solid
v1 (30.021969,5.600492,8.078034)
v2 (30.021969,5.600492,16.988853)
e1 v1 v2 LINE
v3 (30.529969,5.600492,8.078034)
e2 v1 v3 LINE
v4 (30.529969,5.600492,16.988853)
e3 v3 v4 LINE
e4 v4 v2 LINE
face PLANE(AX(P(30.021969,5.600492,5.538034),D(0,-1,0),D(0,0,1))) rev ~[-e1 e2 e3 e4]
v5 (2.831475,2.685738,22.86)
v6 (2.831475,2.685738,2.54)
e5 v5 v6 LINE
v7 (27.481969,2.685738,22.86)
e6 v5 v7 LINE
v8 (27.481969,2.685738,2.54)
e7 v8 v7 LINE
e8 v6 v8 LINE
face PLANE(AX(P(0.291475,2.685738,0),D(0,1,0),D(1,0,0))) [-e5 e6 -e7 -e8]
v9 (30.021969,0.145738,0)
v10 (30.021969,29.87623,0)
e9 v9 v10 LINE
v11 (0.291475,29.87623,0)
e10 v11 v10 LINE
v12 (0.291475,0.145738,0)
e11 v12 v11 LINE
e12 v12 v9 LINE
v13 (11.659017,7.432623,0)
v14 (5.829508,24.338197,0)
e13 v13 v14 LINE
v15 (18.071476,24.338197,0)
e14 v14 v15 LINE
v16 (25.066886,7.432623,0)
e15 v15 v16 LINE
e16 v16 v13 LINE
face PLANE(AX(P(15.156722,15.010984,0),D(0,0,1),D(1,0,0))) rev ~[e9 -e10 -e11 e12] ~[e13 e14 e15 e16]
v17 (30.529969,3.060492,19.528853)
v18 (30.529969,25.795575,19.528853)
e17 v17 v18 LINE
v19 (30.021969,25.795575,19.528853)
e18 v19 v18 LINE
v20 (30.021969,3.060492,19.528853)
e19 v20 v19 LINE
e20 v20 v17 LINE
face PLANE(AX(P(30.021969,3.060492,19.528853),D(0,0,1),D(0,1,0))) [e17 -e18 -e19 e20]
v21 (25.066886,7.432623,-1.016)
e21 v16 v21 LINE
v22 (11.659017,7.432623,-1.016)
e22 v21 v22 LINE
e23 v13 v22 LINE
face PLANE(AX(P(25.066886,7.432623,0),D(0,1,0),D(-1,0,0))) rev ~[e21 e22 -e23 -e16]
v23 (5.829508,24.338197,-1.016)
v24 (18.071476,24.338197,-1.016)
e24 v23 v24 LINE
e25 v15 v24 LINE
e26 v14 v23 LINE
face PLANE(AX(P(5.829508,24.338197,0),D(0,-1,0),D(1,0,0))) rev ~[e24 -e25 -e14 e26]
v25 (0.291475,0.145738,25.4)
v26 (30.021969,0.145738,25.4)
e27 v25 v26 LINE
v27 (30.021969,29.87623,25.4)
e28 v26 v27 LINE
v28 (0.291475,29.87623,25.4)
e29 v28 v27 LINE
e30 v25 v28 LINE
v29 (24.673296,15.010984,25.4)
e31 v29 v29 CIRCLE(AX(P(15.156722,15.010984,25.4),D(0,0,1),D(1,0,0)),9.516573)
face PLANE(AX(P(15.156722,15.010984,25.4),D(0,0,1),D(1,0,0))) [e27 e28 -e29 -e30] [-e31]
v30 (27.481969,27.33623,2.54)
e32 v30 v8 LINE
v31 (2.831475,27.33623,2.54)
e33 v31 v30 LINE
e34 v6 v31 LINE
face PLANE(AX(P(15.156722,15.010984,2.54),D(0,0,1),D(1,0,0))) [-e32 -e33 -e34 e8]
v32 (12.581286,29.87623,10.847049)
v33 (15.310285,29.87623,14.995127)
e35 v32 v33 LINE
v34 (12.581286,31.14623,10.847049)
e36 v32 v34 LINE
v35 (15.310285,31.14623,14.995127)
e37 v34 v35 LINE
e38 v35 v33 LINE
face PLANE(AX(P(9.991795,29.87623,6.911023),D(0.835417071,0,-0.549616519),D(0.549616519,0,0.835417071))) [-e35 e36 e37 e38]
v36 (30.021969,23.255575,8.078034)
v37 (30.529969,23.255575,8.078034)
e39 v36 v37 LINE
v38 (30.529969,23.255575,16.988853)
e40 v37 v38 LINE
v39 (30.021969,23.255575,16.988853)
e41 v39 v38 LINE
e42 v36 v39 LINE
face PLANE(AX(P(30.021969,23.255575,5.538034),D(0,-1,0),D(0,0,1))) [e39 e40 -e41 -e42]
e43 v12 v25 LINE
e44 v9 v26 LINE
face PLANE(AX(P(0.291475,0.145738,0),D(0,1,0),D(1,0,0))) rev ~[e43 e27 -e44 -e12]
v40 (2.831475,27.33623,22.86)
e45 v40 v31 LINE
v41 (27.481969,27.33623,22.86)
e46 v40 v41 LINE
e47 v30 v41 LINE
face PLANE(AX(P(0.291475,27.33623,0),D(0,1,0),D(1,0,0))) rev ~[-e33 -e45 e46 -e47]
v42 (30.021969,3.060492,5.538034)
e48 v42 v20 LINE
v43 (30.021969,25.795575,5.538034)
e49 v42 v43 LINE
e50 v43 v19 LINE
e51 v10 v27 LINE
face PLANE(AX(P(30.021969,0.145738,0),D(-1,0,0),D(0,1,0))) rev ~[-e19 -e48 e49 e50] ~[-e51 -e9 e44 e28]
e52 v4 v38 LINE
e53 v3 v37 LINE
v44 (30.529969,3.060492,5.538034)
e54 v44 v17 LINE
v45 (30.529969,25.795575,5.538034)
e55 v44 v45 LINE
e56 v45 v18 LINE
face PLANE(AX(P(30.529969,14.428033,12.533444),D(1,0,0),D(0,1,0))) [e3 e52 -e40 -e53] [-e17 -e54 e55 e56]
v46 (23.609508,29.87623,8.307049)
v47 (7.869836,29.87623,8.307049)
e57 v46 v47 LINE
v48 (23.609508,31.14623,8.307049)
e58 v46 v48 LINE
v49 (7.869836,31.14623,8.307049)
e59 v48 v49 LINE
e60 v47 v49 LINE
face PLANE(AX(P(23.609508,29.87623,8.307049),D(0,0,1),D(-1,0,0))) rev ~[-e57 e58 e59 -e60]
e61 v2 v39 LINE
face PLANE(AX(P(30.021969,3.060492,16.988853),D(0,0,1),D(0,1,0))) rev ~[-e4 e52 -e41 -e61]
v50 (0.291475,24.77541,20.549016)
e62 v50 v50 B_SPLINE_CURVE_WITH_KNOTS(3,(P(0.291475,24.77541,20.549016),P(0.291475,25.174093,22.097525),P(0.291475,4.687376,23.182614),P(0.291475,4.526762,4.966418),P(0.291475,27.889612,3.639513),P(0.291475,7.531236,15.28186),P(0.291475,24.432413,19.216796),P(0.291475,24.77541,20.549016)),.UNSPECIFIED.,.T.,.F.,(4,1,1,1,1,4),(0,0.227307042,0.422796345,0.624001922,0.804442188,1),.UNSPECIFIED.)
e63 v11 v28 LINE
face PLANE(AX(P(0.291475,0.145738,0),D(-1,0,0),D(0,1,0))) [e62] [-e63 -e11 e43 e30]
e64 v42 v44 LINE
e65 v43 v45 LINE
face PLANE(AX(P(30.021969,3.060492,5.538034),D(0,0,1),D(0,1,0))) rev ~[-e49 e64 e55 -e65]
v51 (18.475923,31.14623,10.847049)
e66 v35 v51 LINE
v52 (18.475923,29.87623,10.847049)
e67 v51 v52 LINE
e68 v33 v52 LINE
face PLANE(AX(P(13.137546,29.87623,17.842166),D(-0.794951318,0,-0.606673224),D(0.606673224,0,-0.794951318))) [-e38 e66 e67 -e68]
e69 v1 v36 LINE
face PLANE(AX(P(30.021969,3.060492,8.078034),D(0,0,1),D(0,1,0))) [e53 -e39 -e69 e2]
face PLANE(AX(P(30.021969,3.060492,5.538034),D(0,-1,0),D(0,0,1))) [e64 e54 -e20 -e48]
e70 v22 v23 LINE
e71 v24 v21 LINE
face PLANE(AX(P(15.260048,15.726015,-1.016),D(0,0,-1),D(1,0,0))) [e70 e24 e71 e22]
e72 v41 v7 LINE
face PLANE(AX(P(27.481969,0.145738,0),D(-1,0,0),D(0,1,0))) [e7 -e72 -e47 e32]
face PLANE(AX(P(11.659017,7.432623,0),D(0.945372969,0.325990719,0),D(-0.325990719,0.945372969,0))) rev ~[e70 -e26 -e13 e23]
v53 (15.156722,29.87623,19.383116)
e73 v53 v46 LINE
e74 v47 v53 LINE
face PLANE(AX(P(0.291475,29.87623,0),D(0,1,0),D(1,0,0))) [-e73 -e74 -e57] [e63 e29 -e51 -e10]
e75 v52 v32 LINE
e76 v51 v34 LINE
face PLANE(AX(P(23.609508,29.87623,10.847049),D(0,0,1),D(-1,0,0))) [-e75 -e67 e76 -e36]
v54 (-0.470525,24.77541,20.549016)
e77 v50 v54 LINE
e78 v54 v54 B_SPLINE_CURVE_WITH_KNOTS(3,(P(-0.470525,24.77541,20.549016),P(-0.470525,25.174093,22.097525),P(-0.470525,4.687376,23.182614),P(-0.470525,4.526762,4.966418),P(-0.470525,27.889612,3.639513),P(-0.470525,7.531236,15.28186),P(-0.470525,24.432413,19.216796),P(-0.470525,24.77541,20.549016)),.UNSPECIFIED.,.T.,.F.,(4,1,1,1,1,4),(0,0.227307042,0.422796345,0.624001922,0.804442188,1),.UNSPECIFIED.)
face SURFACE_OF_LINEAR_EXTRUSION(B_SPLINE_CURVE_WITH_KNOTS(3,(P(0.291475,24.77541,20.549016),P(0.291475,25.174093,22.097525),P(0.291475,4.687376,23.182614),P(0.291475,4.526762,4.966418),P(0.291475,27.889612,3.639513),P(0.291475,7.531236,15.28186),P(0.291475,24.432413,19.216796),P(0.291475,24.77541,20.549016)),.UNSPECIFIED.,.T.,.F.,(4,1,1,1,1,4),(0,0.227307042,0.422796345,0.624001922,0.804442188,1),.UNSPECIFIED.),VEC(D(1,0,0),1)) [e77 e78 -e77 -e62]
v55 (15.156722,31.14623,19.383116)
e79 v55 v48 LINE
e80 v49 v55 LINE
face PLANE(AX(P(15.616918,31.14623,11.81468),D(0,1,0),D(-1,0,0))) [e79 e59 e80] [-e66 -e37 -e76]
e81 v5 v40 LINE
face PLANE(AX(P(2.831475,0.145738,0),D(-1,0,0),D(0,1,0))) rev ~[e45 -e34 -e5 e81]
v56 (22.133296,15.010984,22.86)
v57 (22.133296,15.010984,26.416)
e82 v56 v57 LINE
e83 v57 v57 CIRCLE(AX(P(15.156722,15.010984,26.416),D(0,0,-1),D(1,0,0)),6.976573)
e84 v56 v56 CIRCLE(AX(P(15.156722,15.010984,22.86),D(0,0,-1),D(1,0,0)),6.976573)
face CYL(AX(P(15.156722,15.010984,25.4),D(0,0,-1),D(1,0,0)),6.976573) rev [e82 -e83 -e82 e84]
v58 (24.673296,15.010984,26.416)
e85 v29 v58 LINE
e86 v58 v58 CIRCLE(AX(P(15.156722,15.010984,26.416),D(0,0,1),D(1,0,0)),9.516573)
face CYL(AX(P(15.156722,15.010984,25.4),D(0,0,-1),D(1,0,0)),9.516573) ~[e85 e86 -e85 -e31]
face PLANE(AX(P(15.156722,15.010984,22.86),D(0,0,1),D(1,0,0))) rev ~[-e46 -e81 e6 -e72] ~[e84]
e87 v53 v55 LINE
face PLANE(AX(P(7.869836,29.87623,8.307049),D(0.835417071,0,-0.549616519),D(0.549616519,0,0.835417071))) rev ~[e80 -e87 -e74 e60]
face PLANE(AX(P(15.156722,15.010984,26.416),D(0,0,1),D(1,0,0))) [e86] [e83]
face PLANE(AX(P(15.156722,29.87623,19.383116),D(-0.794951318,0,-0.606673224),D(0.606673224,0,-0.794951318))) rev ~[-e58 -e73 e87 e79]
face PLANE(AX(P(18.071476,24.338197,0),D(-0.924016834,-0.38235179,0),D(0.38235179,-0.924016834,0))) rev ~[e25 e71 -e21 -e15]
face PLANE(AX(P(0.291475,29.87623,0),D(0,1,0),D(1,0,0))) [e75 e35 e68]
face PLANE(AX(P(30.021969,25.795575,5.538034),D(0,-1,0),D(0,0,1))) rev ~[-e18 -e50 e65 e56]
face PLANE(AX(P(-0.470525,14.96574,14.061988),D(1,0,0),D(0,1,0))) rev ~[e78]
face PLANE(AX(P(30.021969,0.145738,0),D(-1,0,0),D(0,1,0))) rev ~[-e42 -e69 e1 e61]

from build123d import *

# Parameters (mm, degrees)
F0_W          = 29.7304940177
F0_H          = 29.7304925771
F1_DEPTH      = 25.4
F2_R          = 9.516573444
F3_DEPTH      = 1.016
F4_T          = -2.54
F5_W          = 22.7350834757
F5_H          = 13.9908185229
F6_DEPTH      = 0.508
F7_T          = 2.54
F7_T3_DEPTH   = 25.4
F7_T5_DEPTH   = 29.7304925771
F7_T7_DEPTH   = 29.7304940177
F7_T9_DEPTH   = 27.8150834757
F7_T11_DEPTH  = 19.0708185229
F9_DEPTH      = 1.27
F10_T         = 2.54
F10_T3_DEPTH  = 25.4
F10_T5_DEPTH  = 29.7304925771
F10_T7_DEPTH  = 29.7304940177
F10_T9_DEPTH  = 20.819671886
F10_T11_DEPTH = 19.0130124822
F10_T13_DEPTH = 18.3381282199
F10_T15_DEPTH = 27.8150834757
F10_T17_DEPTH = 19.0708185229
F10_T19_DEPTH = 22.7350834757
F10_T21_DEPTH = 5.588
F10_T23_DEPTH = 13.9908185229
F12_DEPTH     = 1.016
F14_DEPTH     = 0.762


# Not quite as in the source:
# - a shell that OpenCascade refuses in one call is made with other operations: the cavity is built on its own and cut out


with BuildPart() as f1:
    # F0 (on Top) → F1 (new body)
    with BuildSketch(Plane.XY):
        with Locations((15.1567222201, 15.010983996)):
            Rectangle(F0_W, F0_H)
    extrude(amount=F1_DEPTH)

    # F2 (on face) → F3 (join)
    with BuildSketch(Plane.XY.offset(25.4)):
        with Locations((15.1567222201, 15.010983996)):
            Circle(F2_R)
    extrude(amount=F3_DEPTH)

    # F4
    f4_openings = [f1.faces().sort_by_distance(p)[0] for p in [
        (15.156722, 15.010984, 26.416),
    ]]
    offset(amount=F4_T, openings=f4_openings, kind=Kind.INTERSECTION)

    # F5 (on face) → F6 (join)
    with BuildSketch(Plane.YZ.offset(30.021969229)):
        with Locations((14.4280334935, 12.5334435143)):
            Rectangle(F5_W, F5_H)
    extrude(amount=F6_DEPTH)

    # F7: shell of thickness 2.54, made by hand


with BuildPart() as f7_core1:
    # F7_t2: copy of F1
    add(f1.part)

    # the walls: a layer under each face that stays
    f7_faces = [f7_core1.faces().sort_by_distance(p)[0] for p in [
        (2.8314752113, 15.010983996, 12.7),
        (15.1567222201, 27.3362302846, 12.7),
        (6.9398908809, 6.794153137, 22.86),
        (15.1567222201, 2.6857377075, 12.7),
        (15.1567222201, 15.010983996, 2.54),
        (27.481969229, 15.010983996, 12.7),
        (8.1801487762, 15.010983996, 24.638),
        (8.8123399241, 8.6666017001, 26.416),
        (5.6401487762, 15.010983996, 25.908),
        (5.2465575476, 5.1008198037, 25.4),
        (0.2914752113, 15.010983996, 12.7),
        (15.1567222201, 29.8762302846, 12.7),
        (15.1567222201, 0.1457377075, 12.7),
        (30.021969229, 5.1008198037, 21.1666666667),
        (15.1567222201, 15.010983996, 0),
        (30.275969229, 14.4280334935, 5.5380342528),
        (30.275969229, 3.0604917556, 12.5334435143),
        (30.275969229, 14.4280334935, 19.5288527757),
        (30.275969229, 25.7955752313, 12.5334435143),
    ]]
    thicken(f7_faces, amount=-F7_T, mode=Mode.SUBTRACT)

    # F7_s4 → F7_t3 (cut)
    with BuildSketch(Plane.XY):
        Polygon((2.8568752113, 27.3108302846), (0.2914752113, 27.3362302846), (0.2914752113, 29.8762302846), (2.8314752113, 29.8762302846), align=None)
        Polygon((2.8568752113, 2.7111377075), (0.2914752113, 2.6857377075), (0.2914752113, 0.1457377075), (2.8314752113, 0.1457377075), align=None)
        Polygon((27.456569229, 27.3108302846), (27.481969229, 29.8762302846), (30.021969229, 29.8762302846), (30.021969229, 27.3362302846), align=None)
        Polygon((27.456569229, 2.7111377075), (27.481969229, 0.1457377075), (30.021969229, 0.1457377075), (30.021969229, 2.6857377075), align=None)
    extrude(amount=F7_T3_DEPTH, mode=Mode.SUBTRACT)

    # F7_s6 → F7_t5 (cut)
    with BuildSketch(Plane.XZ.offset(-29.8762302846)):
        Polygon((2.8568752113, 22.8346), (0.2914752113, 22.86), (0.2914752113, 25.4), (2.8314752113, 25.4), align=None)
        Polygon((2.8568752113, 2.5654), (0.2914752113, 2.54), (0.2914752113, 0), (2.8314752113, 0), align=None)
        Polygon((27.456569229, 22.8346), (27.481969229, 25.4), (30.021969229, 25.4), (30.021969229, 22.86), align=None)
        Polygon((27.456569229, 2.5654), (27.481969229, 0), (30.021969229, 0), (30.021969229, 2.54), align=None)
    extrude(amount=F7_T5_DEPTH, mode=Mode.SUBTRACT)

    # F7_s8 → F7_t7 (cut)
    with BuildSketch(Plane.YZ.offset(0.2914752113)):
        Polygon((27.3108302846, 22.8346), (29.8762302846, 22.86), (29.8762302846, 25.4), (27.3362302846, 25.4), align=None)
        Polygon((27.3108302846, 2.5654), (29.8762302846, 2.54), (29.8762302846, 0), (27.3362302846, 0), align=None)
        Polygon((2.7111377075, 22.8346), (2.6857377075, 25.4), (0.1457377075, 25.4), (0.1457377075, 22.86), align=None)
        Polygon((2.7111377075, 2.5654), (0.1457377075, 2.54), (0.1457377075, 0), (2.6857377075, 0), align=None)
    extrude(amount=F7_T7_DEPTH, mode=Mode.SUBTRACT)

    # F7_s10 → F7_t9 (cut)
    with BuildSketch(Plane.XZ.offset(-28.3355752313)):
        Polygon((30.047369229, 5.5126342528), (27.481969229, 5.5380342528), (27.481969229, 8.0780342528), (30.021969229, 8.0780342528), align=None)
        Polygon((30.047369229, 19.5542527757), (27.481969229, 19.5288527757), (27.481969229, 16.9888527757), (30.021969229, 16.9888527757), align=None)
    extrude(amount=F7_T9_DEPTH, mode=Mode.SUBTRACT)

    # F7_s12 → F7_t11 (cut)
    with BuildSketch(Plane.XY.offset(2.9980342528)):
        Polygon((30.047369229, 3.0350917556), (27.481969229, 3.0604917556), (27.481969229, 5.6004917556), (30.021969229, 5.6004917556), align=None)
        Polygon((30.047369229, 25.8209752313), (27.481969229, 25.7955752313), (27.481969229, 23.2555752313), (30.021969229, 23.2555752313), align=None)
    extrude(amount=F7_T11_DEPTH, mode=Mode.SUBTRACT)

    # F7_s13 → F7_t14 (revolve, cut)
    with BuildSketch(Plane.XZ.offset(-15.010983996)):
        Polygon((24.6986956641, 25.4254), (22.1332956641, 25.4), (22.1332956641, 22.86), (24.6732956641, 22.86), align=None)
    revolve(axis=Axis((15.1567222201, 15.010983996, 25.4), (0, 0, 1)), mode=Mode.SUBTRACT)


with BuildPart() as f1_1:
    add(f1.part)

    # what is left inside the walls is the cavity
    f7_cavity = [f7_core1.part.solids().sort_by_distance(p)[0] for p in [
        (30.047369, 14.428033, 14.01858),
    ]]
    add(f7_cavity, mode=Mode.SUBTRACT)

    # F8 (on face) → F9 (join)
    with BuildSketch(Plane(origin=(0, 29.8762302846, 0), x_dir=(-1, 0, 0), z_dir=(0, 1, 0))):
        Polygon((-7.869835943, 8.3070490509), (-15.1567222201, 19.3831156939), (-23.609507829, 8.3070490509), (-15.1567222201, 8.3070490509), align=None)
    extrude(amount=F9_DEPTH)

    # F10: shell of thickness 2.54, made by hand


with BuildPart() as f10_core1:
    # F10_t2: copy of F1
    add(f1_1.part)

    # the walls: a layer under each face that stays
    f10_faces = [f10_core1.faces().sort_by_distance(p)[0] for p in [
        (2.8314752113, 15.010983996, 12.7),
        (15.1567222201, 27.3362302846, 12.7),
        (6.9398908809, 6.794153137, 22.86),
        (15.1567222201, 2.6857377075, 12.7),
        (15.1567222201, 15.010983996, 2.54),
        (27.481969229, 15.010983996, 12.7),
        (8.1801487762, 15.010983996, 24.638),
        (8.8123399241, 8.6666017001, 26.416),
        (5.6401487762, 15.010983996, 25.908),
        (5.2465575476, 5.1008198037, 25.4),
        (0.2914752113, 15.010983996, 12.7),
        (25.0668868927, 29.8762302846, 21.1666666667),
        (15.1567222201, 0.1457377075, 12.7),
        (30.021969229, 5.1008198037, 21.1666666667),
        (15.1567222201, 15.010983996, 0),
        (15.739671886, 30.5112302846, 8.3070490509),
        (19.3831150245, 30.5112302846, 13.8450823724),
        (11.5132790816, 30.5112302846, 13.8450823724),
        (30.275969229, 14.4280334935, 5.5380342528),
        (30.275969229, 3.0604917556, 12.5334435143),
        (30.275969229, 14.4280334935, 19.5288527757),
        (30.275969229, 25.7955752313, 12.5334435143),
        (30.529969229, 6.8496723349, 7.86983734),
        (30.275969229, 14.4280334935, 8.0780342528),
        (30.275969229, 23.2555752313, 12.5334435143),
        (30.275969229, 14.4280334935, 16.9888527757),
        (30.275969229, 5.6004917556, 12.5334435143),
        (30.021969229, 14.4280334935, 12.5334435143),
    ]]
    thicken(f10_faces, amount=-F10_T, mode=Mode.SUBTRACT)

    # F10_s4 → F10_t3 (cut)
    with BuildSketch(Plane.XY):
        Polygon((2.8568752113, 27.3108302846), (0.2914752113, 27.3362302846), (0.2914752113, 29.8762302846), (2.8314752113, 29.8762302846), align=None)
        Polygon((2.8568752113, 2.7111377075), (0.2914752113, 2.6857377075), (0.2914752113, 0.1457377075), (2.8314752113, 0.1457377075), align=None)
        Polygon((27.456569229, 27.3108302846), (27.481969229, 29.8762302846), (30.021969229, 29.8762302846), (30.021969229, 27.3362302846), align=None)
        Polygon((27.456569229, 2.7111377075), (27.481969229, 0.1457377075), (30.021969229, 0.1457377075), (30.021969229, 2.6857377075), align=None)
    extrude(amount=F10_T3_DEPTH, mode=Mode.SUBTRACT)

    # F10_s6 → F10_t5 (cut)
    with BuildSketch(Plane.XZ.offset(-29.8762302846)):
        Polygon((2.8568752113, 22.8346), (0.2914752113, 22.86), (0.2914752113, 25.4), (2.8314752113, 25.4), align=None)
        Polygon((2.8568752113, 2.5654), (0.2914752113, 2.54), (0.2914752113, 0), (2.8314752113, 0), align=None)
        Polygon((27.456569229, 22.8346), (27.481969229, 25.4), (30.021969229, 25.4), (30.021969229, 22.86), align=None)
        Polygon((27.456569229, 2.5654), (27.481969229, 0), (30.021969229, 0), (30.021969229, 2.54), align=None)
    extrude(amount=F10_T5_DEPTH, mode=Mode.SUBTRACT)

    # F10_s8 → F10_t7 (cut)
    with BuildSketch(Plane.YZ.offset(0.2914752113)):
        Polygon((27.3108302846, 22.8346), (29.8762302846, 22.86), (29.8762302846, 25.4), (27.3362302846, 25.4), align=None)
        Polygon((27.3108302846, 2.5654), (29.8762302846, 2.54), (29.8762302846, 0), (27.3362302846, 0), align=None)
        Polygon((2.7111377075, 22.8346), (2.6857377075, 25.4), (0.1457377075, 25.4), (0.1457377075, 22.86), align=None)
        Polygon((2.7111377075, 2.5654), (0.1457377075, 2.54), (0.1457377075, 0), (2.6857377075, 0), align=None)
    extrude(amount=F10_T7_DEPTH, mode=Mode.SUBTRACT)

    # F10_s10 → F10_t9 (cut)
    with BuildSketch(Plane.YZ.offset(5.329835943)):
        Polygon((29.9016302846, 8.2816490509), (27.3362302846, 8.3070490509), (27.3362302846, 10.8470490509), (29.8762302846, 10.8470490509), align=None)
    extrude(amount=F10_T9_DEPTH, mode=Mode.SUBTRACT)

    # F10_s12 → F10_t11 (cut)
    with BuildSketch(Plane(origin=(-5.3104872769, 0, 6.9585712577), x_dir=(0, 1, 0), z_dir=(0.6066732244, 0, -0.7949513185))):
        Polygon((29.9016302846, 23.8334736105), (27.3362302846, 23.8080736105), (27.3362302846, 21.2680736105), (29.8762302846, 21.2680736105), align=None)
    extrude(amount=F10_T11_DEPTH, mode=Mode.SUBTRACT)

    # F10_s14 → F10_t13 (cut)
    with BuildSketch(Plane(origin=(4.7955373639, 0, 7.2892164652), x_dir=(0, 1, 0), z_dir=(0.5496165187, 0, 0.8354170709))):
        Polygon((29.9016302846, -1.9835039116), (27.3362302846, -2.0089039116), (27.3362302846, -4.5489039116), (29.8762302846, -4.5489039116), align=None)
    extrude(amount=F10_T13_DEPTH, mode=Mode.SUBTRACT)

    # F10_s16 → F10_t15 (cut)
    with BuildSketch(Plane.XZ.offset(-28.3355752313)):
        Polygon((30.047369229, 5.5126342528), (27.481969229, 5.5380342528), (27.481969229, 8.0780342528), (30.021969229, 8.0780342528), align=None)
        Polygon((30.047369229, 19.5542527757), (27.481969229, 19.5288527757), (27.481969229, 16.9888527757), (30.021969229, 16.9888527757), align=None)
    extrude(amount=F10_T15_DEPTH, mode=Mode.SUBTRACT)

    # F10_s18 → F10_t17 (cut)
    with BuildSketch(Plane.XY.offset(2.9980342528)):
        Polygon((30.047369229, 3.0350917556), (27.481969229, 3.0604917556), (27.481969229, 5.6004917556), (30.021969229, 5.6004917556), align=None)
        Polygon((30.047369229, 25.8209752313), (27.481969229, 25.7955752313), (27.481969229, 23.2555752313), (30.021969229, 23.2555752313), align=None)
    extrude(amount=F10_T17_DEPTH, mode=Mode.SUBTRACT)

    # F10_s20 → F10_t19 (cut)
    with BuildSketch(Plane.XZ.offset(-25.7955752313)):
        Polygon((30.047369229, 8.1034342528), (30.021969229, 5.5380342528), (27.481969229, 5.5380342528), (27.481969229, 8.0780342528), align=None)
        Polygon((30.047369229, 16.9634527757), (30.021969229, 19.5288527757), (27.481969229, 19.5288527757), (27.481969229, 16.9888527757), align=None)
    extrude(amount=F10_T19_DEPTH, mode=Mode.SUBTRACT)

    # F10_s22 → F10_t21 (cut)
    with BuildSketch(Plane.YZ.offset(27.481969229)):
        Polygon((23.2301752313, 8.1034342528), (23.2555752313, 5.5380342528), (25.7955752313, 5.5380342528), (25.7955752313, 8.0780342528), align=None)
        Polygon((5.6258917556, 8.1034342528), (5.6004917556, 5.5380342528), (3.0604917556, 5.5380342528), (3.0604917556, 8.0780342528), align=None)
        Polygon((23.2301752313, 16.9634527757), (25.7955752313, 16.9888527757), (25.7955752313, 19.5288527757), (23.2555752313, 19.5288527757), align=None)
        Polygon((5.6258917556, 16.9634527757), (5.6004917556, 19.5288527757), (3.0604917556, 19.5288527757), (3.0604917556, 16.9888527757), align=None)
    extrude(amount=F10_T21_DEPTH, mode=Mode.SUBTRACT)

    # F10_s24 → F10_t23 (cut)
    with BuildSketch(Plane.XY.offset(5.5380342528)):
        Polygon((30.047369229, 23.2301752313), (30.021969229, 25.7955752313), (27.481969229, 25.7955752313), (27.481969229, 23.2555752313), align=None)
        Polygon((30.047369229, 5.6258917556), (30.021969229, 3.0604917556), (27.481969229, 3.0604917556), (27.481969229, 5.6004917556), align=None)
    extrude(amount=F10_T23_DEPTH, mode=Mode.SUBTRACT)

    # F10_s25 → F10_t26 (revolve, cut)
    with BuildSketch(Plane.XZ.offset(-15.010983996)):
        Polygon((24.6986956641, 25.4254), (22.1332956641, 25.4), (22.1332956641, 22.86), (24.6732956641, 22.86), align=None)
    revolve(axis=Axis((15.1567222201, 15.010983996, 25.4), (0, 0, 1)), mode=Mode.SUBTRACT)


with BuildPart() as f1_2:
    add(f1_1.part)

    # what is left inside the walls is the cavity
    f10_cavity = [f10_core1.part.solids().sort_by_distance(p)[0] for p in [
        (15.528605, 29.90163, 13.612435),
    ]]
    add(f10_cavity, mode=Mode.SUBTRACT)

    # F11 (on face) → F12 (join)
    with BuildSketch(Plane(origin=(0, 0, 0), x_dir=(1, 0, 0), z_dir=(0, 0, -1))):
        Polygon((25.0668860972, -7.4326233007), (11.6590168327, -7.4326233007), (5.8295079507, -24.3381969631), (18.0714763701, -24.3381969631), align=None)
    extrude(amount=F12_DEPTH)

    # F13 (on face) → F14 (join)
    with BuildSketch(Plane(origin=(0.2914752113, 0, 0), x_dir=(0, -1, 0), z_dir=(-1, 0, 0))):
        with BuildLine():
            add(Edge.make_bspline(
                [(-24.775410071, 20.5490160733), (-25.1740933695, 22.0975250298), (-4.6873757083, 23.1826141504), (-4.5267621045, 4.9664176824), (-27.8896118654, 3.6395127919), (-7.5312359208, 15.2818602681), (-24.4324130709, 19.2167959159), (-24.775410071, 20.5490160733)],
                knots=[0, 0, 0, 0, 0.2273070421, 0.4227963447, 0.6240019215, 0.804442188, 1, 1, 1, 1], degree=3))
        make_face()
    extrude(amount=F14_DEPTH)


solid = f1_2.part
